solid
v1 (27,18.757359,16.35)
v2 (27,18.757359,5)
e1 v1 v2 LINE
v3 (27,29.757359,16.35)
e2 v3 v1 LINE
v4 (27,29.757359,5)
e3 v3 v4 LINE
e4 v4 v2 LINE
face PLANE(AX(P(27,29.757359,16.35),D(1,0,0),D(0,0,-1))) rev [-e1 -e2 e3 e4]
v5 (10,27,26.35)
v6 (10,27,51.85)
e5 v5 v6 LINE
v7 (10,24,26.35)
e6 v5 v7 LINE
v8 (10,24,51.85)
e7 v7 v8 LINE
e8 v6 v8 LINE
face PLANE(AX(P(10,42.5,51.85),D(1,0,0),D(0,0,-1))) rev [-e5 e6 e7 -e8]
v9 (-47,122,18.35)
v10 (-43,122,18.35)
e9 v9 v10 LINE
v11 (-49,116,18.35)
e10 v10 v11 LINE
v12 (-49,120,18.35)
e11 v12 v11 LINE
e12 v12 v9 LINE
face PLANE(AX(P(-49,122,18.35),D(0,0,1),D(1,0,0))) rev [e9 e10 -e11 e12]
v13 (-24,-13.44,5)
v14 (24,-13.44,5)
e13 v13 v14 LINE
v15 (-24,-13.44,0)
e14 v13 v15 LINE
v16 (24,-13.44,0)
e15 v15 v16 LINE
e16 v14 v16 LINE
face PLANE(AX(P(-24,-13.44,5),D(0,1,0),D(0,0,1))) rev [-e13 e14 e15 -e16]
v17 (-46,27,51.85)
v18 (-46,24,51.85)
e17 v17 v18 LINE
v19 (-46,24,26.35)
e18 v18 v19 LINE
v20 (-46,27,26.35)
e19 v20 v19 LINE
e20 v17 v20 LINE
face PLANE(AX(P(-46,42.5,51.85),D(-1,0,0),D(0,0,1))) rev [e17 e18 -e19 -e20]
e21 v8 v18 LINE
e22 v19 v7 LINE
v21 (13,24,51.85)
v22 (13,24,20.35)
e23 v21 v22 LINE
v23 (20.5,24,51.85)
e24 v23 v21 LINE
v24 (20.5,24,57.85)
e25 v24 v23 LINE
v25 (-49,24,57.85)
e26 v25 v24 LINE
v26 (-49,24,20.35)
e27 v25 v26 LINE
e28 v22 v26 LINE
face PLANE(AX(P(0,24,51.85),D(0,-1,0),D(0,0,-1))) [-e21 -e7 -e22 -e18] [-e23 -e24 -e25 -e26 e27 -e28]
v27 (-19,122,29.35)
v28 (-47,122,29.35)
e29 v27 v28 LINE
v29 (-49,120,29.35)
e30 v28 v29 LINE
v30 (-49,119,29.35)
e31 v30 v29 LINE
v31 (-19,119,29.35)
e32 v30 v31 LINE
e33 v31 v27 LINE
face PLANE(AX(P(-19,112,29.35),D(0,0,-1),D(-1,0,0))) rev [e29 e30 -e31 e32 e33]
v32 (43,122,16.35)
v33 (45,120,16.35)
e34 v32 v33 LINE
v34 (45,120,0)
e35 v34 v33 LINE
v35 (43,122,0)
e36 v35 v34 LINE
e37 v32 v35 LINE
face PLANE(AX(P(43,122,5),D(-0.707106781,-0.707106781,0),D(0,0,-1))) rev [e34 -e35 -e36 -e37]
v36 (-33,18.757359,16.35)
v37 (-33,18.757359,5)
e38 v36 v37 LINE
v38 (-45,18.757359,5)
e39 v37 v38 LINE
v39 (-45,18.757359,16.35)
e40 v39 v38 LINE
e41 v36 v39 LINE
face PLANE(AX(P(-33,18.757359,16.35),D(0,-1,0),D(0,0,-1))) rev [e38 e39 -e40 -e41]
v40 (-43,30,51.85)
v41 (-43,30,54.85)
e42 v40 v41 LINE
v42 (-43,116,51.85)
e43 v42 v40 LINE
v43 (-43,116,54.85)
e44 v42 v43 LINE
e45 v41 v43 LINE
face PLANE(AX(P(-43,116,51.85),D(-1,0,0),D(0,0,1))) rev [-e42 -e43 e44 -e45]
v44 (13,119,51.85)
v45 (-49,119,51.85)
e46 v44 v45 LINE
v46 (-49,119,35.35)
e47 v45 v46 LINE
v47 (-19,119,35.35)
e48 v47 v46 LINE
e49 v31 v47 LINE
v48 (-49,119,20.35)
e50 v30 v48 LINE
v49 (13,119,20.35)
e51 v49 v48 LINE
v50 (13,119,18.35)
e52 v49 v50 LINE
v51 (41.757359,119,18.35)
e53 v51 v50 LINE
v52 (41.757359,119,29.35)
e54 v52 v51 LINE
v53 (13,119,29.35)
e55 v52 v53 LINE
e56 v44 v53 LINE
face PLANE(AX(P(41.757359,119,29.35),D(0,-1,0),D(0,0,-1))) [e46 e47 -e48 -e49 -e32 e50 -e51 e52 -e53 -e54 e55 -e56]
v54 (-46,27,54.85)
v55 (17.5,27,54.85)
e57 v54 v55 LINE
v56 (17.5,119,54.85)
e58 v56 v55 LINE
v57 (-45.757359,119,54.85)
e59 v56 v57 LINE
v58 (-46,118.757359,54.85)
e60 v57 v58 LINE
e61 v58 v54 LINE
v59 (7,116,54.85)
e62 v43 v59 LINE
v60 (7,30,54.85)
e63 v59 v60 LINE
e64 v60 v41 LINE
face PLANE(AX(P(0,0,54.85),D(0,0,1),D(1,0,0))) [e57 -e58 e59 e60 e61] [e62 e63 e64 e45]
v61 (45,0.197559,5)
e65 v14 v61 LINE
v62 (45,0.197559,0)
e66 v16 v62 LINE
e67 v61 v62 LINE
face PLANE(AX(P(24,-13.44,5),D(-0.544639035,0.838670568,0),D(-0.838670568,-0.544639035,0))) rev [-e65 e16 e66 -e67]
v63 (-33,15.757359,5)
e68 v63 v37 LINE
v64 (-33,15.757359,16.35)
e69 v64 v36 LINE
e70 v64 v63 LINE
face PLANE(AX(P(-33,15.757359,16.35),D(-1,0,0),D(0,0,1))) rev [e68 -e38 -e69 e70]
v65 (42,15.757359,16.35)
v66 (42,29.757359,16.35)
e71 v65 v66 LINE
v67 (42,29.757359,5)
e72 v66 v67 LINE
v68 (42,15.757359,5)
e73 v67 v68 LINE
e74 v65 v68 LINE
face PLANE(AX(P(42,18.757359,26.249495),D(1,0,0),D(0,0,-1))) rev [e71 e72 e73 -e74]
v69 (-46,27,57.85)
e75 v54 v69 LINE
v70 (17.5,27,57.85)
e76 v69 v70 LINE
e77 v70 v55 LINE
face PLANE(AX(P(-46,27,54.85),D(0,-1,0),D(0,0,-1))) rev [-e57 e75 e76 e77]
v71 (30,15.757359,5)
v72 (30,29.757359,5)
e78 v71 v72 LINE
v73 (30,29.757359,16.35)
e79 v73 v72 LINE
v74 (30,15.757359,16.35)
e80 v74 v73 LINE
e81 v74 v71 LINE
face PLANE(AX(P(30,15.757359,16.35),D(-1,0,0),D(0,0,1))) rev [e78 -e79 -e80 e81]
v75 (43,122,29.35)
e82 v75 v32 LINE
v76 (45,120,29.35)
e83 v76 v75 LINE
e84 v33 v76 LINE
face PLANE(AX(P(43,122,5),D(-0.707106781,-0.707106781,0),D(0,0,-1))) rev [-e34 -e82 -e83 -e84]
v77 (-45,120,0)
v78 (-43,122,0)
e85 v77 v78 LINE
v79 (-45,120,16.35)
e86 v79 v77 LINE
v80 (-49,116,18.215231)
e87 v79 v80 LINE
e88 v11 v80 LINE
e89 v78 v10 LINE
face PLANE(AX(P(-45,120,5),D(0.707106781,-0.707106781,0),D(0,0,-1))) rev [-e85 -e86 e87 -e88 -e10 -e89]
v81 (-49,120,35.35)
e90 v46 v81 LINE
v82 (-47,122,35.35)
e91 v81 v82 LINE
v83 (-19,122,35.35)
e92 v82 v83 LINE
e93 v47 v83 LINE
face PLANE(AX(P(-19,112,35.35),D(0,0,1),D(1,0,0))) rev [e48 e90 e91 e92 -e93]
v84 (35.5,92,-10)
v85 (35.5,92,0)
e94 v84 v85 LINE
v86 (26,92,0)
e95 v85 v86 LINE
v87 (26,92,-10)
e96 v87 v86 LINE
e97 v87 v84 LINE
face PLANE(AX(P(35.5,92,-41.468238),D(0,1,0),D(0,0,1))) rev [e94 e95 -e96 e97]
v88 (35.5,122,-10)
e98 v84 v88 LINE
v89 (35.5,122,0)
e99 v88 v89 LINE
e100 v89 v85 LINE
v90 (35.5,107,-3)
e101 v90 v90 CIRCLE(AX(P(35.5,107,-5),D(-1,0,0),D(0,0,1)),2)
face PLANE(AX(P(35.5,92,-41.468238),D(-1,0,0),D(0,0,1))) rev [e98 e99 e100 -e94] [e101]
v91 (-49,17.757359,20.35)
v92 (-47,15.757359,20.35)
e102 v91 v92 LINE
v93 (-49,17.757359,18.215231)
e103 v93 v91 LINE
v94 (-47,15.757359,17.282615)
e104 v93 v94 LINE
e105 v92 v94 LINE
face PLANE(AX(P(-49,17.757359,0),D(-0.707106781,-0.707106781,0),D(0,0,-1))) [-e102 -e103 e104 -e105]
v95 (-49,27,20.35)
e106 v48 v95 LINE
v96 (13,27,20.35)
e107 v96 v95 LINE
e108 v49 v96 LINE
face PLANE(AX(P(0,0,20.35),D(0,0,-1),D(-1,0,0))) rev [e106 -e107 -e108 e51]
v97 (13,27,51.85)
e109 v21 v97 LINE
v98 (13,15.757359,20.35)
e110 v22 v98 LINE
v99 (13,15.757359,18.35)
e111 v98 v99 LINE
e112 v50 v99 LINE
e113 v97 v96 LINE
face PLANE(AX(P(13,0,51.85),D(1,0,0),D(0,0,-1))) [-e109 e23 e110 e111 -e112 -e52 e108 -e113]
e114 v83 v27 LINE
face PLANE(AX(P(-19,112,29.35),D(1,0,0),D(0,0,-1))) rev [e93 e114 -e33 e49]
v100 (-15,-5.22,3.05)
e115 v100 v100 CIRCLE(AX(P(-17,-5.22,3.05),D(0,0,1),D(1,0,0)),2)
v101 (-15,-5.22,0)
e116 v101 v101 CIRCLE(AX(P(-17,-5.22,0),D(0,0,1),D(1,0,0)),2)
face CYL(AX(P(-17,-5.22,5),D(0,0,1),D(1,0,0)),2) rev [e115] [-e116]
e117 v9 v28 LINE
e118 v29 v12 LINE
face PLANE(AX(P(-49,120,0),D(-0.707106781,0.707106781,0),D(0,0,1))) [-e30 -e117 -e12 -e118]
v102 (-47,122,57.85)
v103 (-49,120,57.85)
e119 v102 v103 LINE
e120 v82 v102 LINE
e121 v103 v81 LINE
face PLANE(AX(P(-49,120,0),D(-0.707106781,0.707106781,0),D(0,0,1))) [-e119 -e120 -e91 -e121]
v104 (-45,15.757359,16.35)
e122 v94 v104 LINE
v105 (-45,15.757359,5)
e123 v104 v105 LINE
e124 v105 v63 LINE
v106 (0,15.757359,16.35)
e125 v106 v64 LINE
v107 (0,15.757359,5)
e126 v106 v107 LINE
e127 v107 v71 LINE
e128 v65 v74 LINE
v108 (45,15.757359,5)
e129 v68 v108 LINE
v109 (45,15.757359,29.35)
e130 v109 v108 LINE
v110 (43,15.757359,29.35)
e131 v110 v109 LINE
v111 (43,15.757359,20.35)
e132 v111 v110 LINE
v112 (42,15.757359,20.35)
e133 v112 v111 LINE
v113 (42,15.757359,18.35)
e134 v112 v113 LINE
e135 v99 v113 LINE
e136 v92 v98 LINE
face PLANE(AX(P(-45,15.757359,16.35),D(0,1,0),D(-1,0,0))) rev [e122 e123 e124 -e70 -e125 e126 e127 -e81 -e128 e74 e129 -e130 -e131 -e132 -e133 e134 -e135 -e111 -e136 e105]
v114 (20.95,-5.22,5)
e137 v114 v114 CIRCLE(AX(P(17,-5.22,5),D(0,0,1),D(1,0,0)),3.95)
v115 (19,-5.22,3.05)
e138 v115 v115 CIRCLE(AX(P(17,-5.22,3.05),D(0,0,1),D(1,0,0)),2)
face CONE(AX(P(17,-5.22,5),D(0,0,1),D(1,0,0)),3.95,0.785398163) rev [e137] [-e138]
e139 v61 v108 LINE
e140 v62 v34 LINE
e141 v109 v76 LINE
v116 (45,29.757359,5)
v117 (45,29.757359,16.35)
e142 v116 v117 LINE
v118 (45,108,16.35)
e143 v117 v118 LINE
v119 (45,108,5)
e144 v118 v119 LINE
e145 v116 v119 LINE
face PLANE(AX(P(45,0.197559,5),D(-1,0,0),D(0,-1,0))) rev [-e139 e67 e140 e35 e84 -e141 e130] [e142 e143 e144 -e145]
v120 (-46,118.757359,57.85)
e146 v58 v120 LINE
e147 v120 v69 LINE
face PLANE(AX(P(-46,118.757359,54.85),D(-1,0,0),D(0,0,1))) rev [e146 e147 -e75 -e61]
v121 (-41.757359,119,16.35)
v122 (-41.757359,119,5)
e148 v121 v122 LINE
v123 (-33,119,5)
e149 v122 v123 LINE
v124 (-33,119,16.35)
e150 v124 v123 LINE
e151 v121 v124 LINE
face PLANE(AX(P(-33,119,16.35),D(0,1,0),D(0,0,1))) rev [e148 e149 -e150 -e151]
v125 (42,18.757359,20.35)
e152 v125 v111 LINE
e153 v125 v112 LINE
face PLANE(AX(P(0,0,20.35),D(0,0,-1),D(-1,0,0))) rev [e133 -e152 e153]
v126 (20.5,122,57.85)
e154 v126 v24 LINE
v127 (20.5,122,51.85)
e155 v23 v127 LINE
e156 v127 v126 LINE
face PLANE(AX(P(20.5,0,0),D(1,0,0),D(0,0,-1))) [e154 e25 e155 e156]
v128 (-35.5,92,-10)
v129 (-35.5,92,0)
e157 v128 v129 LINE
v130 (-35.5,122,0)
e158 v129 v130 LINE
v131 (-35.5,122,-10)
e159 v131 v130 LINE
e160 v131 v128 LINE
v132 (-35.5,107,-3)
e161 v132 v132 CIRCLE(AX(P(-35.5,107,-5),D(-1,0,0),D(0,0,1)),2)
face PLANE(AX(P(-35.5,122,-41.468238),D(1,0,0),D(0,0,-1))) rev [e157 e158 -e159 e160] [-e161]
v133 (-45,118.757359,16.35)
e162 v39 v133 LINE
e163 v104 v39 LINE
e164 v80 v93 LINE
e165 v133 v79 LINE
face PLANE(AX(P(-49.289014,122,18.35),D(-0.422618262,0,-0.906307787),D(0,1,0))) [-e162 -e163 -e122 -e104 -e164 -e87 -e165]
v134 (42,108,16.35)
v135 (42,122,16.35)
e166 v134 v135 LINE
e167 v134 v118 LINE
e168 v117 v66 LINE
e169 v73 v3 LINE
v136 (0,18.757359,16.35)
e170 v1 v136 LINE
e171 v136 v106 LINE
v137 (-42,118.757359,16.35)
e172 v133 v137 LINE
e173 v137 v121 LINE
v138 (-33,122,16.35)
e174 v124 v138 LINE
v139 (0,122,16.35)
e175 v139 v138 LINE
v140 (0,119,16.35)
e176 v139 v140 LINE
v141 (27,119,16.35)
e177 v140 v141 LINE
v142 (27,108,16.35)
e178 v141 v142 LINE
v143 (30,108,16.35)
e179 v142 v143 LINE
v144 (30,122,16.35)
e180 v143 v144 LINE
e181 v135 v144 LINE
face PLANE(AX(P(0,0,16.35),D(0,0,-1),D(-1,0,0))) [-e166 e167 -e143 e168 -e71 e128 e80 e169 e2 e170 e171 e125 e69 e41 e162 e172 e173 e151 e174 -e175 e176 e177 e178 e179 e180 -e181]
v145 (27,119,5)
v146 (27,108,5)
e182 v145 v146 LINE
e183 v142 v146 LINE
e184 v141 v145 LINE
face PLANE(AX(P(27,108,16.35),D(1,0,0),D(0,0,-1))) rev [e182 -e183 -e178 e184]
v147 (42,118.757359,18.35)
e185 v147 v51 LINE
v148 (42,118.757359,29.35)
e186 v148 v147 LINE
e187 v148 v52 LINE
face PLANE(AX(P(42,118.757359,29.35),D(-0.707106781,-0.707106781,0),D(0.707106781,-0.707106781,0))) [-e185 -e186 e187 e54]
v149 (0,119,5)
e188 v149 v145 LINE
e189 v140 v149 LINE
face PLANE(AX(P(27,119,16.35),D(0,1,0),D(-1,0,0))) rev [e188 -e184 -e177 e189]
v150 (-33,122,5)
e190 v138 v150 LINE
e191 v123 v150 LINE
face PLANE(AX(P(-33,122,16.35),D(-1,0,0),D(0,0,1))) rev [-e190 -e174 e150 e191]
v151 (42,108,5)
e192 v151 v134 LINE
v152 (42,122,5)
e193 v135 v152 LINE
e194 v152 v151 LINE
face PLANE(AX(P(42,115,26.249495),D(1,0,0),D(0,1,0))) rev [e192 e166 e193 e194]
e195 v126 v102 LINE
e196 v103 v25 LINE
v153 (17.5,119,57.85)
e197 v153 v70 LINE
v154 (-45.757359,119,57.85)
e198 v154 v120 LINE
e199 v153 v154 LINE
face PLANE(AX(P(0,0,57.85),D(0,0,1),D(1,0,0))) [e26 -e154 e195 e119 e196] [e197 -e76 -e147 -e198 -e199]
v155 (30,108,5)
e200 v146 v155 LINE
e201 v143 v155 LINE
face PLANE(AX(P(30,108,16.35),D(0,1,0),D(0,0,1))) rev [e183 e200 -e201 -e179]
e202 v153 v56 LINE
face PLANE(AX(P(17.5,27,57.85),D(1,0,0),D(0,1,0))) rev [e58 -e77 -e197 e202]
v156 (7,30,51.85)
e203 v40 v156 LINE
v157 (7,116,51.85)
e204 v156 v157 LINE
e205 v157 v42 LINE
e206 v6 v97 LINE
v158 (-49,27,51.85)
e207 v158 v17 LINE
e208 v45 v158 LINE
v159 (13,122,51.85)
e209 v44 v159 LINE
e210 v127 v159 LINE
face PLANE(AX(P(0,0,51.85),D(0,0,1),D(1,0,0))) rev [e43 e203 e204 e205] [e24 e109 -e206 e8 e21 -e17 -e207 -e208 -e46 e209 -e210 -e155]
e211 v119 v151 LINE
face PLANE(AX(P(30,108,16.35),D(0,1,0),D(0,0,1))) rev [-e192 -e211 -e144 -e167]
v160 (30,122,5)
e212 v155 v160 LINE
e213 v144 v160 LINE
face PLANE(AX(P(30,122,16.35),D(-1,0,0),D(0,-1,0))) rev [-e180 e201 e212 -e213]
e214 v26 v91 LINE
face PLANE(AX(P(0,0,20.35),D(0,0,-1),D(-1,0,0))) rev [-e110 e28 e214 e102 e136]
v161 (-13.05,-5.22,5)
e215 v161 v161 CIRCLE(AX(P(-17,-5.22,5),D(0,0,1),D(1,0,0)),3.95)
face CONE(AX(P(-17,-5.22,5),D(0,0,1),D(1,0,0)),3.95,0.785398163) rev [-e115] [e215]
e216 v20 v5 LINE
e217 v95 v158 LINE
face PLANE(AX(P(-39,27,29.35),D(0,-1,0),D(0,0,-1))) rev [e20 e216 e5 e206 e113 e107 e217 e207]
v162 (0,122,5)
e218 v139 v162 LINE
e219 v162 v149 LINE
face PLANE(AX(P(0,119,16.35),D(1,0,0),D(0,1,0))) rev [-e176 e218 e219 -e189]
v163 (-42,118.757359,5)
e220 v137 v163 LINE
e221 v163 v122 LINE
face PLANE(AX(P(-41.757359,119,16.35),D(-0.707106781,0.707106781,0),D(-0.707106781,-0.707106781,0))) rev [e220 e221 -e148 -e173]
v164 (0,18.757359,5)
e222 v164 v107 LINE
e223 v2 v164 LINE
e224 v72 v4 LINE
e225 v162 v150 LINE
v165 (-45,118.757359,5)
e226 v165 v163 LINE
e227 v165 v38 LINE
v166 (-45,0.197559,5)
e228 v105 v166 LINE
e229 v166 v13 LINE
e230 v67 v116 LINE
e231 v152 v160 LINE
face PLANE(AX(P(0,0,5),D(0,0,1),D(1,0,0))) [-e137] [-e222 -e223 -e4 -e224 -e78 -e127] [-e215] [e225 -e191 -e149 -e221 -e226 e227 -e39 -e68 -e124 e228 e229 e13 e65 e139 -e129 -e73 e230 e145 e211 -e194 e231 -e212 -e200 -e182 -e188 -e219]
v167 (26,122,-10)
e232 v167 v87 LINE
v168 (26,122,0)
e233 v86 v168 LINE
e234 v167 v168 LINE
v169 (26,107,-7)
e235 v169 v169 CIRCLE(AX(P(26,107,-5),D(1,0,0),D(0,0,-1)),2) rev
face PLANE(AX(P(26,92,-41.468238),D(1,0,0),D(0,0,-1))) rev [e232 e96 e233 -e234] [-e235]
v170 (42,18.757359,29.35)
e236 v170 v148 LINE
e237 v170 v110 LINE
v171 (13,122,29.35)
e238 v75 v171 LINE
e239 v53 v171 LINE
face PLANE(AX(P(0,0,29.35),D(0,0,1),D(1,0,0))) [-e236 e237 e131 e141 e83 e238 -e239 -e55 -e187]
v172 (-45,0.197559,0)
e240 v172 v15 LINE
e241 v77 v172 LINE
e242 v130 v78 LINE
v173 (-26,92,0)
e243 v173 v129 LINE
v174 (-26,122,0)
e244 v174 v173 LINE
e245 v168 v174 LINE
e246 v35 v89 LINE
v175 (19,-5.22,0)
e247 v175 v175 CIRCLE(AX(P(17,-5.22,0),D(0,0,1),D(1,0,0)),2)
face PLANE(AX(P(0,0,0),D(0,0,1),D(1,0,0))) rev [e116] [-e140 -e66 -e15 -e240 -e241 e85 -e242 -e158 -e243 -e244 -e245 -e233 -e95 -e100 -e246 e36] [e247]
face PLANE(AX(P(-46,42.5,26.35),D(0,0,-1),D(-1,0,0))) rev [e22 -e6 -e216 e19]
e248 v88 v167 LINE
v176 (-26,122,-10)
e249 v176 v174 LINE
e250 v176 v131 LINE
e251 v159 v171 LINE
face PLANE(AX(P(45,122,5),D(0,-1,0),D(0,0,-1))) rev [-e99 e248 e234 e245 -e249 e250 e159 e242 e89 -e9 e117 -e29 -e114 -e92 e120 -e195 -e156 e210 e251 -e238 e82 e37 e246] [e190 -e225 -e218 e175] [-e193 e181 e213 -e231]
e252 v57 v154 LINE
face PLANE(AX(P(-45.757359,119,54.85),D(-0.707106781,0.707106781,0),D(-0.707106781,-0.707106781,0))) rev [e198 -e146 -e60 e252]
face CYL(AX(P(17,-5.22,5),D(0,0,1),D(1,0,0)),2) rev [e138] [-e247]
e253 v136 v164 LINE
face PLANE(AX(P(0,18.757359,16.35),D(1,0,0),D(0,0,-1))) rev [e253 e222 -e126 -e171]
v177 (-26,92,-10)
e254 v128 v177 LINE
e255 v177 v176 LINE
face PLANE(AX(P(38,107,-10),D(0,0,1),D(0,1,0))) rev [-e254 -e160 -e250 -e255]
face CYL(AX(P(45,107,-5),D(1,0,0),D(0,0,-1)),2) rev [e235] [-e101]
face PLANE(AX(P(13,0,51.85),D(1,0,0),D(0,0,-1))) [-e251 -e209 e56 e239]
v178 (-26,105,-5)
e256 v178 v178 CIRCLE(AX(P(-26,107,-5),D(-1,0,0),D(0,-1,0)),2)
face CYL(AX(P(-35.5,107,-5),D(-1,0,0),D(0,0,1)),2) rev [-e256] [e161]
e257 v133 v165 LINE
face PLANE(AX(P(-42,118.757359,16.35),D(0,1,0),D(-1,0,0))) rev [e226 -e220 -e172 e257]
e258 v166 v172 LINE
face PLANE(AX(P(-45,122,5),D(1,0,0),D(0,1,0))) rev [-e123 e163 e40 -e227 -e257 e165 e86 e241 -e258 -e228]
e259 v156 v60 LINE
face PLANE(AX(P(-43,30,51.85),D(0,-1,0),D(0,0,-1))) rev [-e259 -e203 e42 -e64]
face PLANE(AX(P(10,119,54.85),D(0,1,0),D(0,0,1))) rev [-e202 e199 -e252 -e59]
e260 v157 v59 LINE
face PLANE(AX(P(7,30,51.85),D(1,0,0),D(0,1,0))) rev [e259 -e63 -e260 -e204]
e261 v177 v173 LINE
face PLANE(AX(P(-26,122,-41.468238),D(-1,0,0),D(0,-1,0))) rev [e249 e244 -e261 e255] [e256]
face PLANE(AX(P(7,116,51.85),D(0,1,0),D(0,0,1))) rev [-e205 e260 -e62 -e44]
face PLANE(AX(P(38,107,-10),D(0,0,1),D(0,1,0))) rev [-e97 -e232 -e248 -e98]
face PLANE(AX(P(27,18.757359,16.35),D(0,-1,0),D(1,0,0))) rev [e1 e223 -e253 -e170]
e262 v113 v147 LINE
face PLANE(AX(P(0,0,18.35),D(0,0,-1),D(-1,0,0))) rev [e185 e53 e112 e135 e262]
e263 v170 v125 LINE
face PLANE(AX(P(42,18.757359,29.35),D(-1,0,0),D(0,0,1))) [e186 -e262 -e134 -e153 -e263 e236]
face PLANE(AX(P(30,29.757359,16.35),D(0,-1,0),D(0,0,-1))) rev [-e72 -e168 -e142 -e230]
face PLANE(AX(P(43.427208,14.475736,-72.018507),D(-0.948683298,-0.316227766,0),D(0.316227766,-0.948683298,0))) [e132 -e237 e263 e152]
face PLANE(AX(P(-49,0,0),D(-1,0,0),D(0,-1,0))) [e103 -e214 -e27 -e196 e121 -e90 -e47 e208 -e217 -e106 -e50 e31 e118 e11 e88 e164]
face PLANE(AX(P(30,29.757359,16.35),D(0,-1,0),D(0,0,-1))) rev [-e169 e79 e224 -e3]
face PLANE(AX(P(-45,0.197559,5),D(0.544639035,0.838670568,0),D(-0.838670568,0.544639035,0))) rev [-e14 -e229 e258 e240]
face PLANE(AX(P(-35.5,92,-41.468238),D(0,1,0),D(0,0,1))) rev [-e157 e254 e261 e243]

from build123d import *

# Parameters (mm, degrees)
BOSS_EXTRUDE1_DEPTH           = 5
CHAMFER1_SIZE                 = 2
SKETCH4_W                     = 12
SKETCH4_H                     = 3
BOSS_EXTRUDE2_DEPTH           = 11.35
BOSS_EXTRUDE3_DEPTH           = 4
BOSS_EXTRUDE4_DEPTH           = 11.35
CHAMFER2_START                = 116.672618896
CHAMFER2_OUTLINE_W            = 5
CHAMFER2_OUTLINE_H            = 5.65
CHAMFER2_DEPTH                = 2.327381104
CUT_EXTRUDE2_DEPTH            = 2
BOSS_EXTRUDE5_DEPTH           = 9
BOSS_EXTRUDE6_DEPTH           = 12
SKETCH11_W                    = 3
SKETCH11_H                    = 100.242640687
BOSS_EXTRUDE7_DEPTH           = 9
CHAMFER3_SIZE                 = 2
SKETCH12_W                    = 21
SKETCH12_H                    = 5
CUT_EXTRUDE3_DEPTH            = 9
CHAMFER5_SIZE                 = 4.996701125
CHAMFER5_SIZE_2               = 2.33
SKETCH13_W                    = 12
SKETCH13_H                    = 11.35
CUT_EXTRUDE4_DEPTH            = 117
SKETCH14_W                    = 3
SKETCH14_H                    = 11.35
BOSS_EXTRUDE8_DEPTH           = 7
BOSS_EXTRUDE9_START           = 85.242641
SKETCH14_2_W                  = 3
SKETCH14_2_H                  = 11.35
BOSS_EXTRUDE9_DEPTH           = 8
SKETCH15_W                    = 9
SKETCH15_H                    = 92
CUT_EXTRUDE5_DEPTH            = 10
BOSS_EXTRUDE10_START          = -9
SKETCH16_W                    = 62
SKETCH16_H                    = 3
BOSS_EXTRUDE10_DEPTH          = 31.5
BOSS_EXTRUDE12_DEPTH          = 6
SKETCH18_W                    = 50
SKETCH18_H                    = 86
CUT_EXTRUDE6_DEPTH            = 6
CUT_EXTRUDE7_DEPTH            = 3
SKETCH20_W                    = 6
SKETCH20_H                    = 98
CUT_EXTRUDE8_DEPTH            = 3
BOSS_EXTRUDE13_DEPTH          = 10.5
SKETCH22_W                    = 3
SKETCH22_H                    = 92
BOSS_EXTRUDE14_DEPTH          = 3
CUT_EXTRUDE9_START            = -2
CUT_EXTRUDE9_DEPTH            = 10
CUT_EXTRUDE10_DEPTH           = 9
SKETCH25_W                    = 9.5
SKETCH25_H                    = 30
BOSS_EXTRUDE15_DEPTH          = 10
CSK_FOR_M4_SFHCS2_D           = 4
CSK_FOR_M4_SFHCS2_DEPTH       = 13
CSK_FOR_M4_SFHCS2_CSINK_D     = 7.9
CSK_FOR_M4_SFHCS2_CSINK_ANGLE = 90
CSK_FOR_M4_SFHCS2_TIP         = 1.201721238
CHAMFER6_SIZE                 = 2
CHAMFER6_SIZE_2               = 4.289013841
SKETCH30_W                    = 56
SKETCH30_H                    = 25.5
CUT_EXTRUDE11_DEPTH           = 18.5
SKETCH32_W                    = 30
SKETCH32_H                    = 6
CUT_EXTRUDE13_DEPTH           = 10
CSK_FOR_M4_SFHCS3_D           = 4
CSK_FOR_M4_SFHCS3_DEPTH       = 19
CSK_FOR_M4_SFHCS3_CSINK_D     = 7.9
CSK_FOR_M4_SFHCS3_CSINK_ANGLE = 90
CSK_FOR_M4_SFHCS3_TIP         = 1.201721238
F_4_0MM_DOWEL_HOLE1_D         = 4


with BuildPart() as part:
    # Sketch2 → Boss-Extrude1 (new body)
    with BuildSketch(Plane.XY):
        Polygon((-45, 122), (-45, 0.197559457), (-24, -13.44), (24, -13.44), (45, 0.197559457), (45, 122), align=None)
    extrude(amount=BOSS_EXTRUDE1_DEPTH)

    # Chamfer1
    chamfer1_edges = [part.edges().sort_by_distance(p)[0] for p in [
        (45, 122, 2.5),
        (-45, 122, 2.5),
    ]]
    chamfer(chamfer1_edges, length=CHAMFER1_SIZE)

    # Sketch4 → Boss-Extrude2 (add)
    with BuildSketch(Plane.XY.offset(5)):
        Polygon((-45, 120), (-43, 122), (-33, 122), (-33, 119), (-41.757359313, 119), (-42, 118.757359313), (-45, 118.757359313), align=None)
        with Locations((-39, 17.257359313)):
            Rectangle(SKETCH4_W, SKETCH4_H)
        Polygon((0, 122), (30, 122), (30, 108), (27, 108), (27, 119), (0, 119), align=None)
        Polygon((0, 15.757359313), (30, 15.757359313), (30, 29.757359313), (27, 29.757359313), (27, 18.757359313), (0, 18.757359313), align=None)
    extrude(amount=BOSS_EXTRUDE2_DEPTH)

    # Sketch5 → Boss-Extrude3 (add)
    with BuildSketch(Plane.XY.offset(16.35)):
        Polygon((45, 15.757359313), (-45, 15.757359313), (-45, 120), (-43, 122), (45, 122), align=None)
    extrude(amount=BOSS_EXTRUDE3_DEPTH)

    # Sketch6 → Boss-Extrude4 (add)
    with BuildSketch(Plane.XY.offset(5)):
        Polygon((38, 122), (43, 122), (45, 120), (45, 115), (42, 115), (42, 118.757359313), (41.757359313, 119), (38, 119), align=None)
        Polygon((45, 15.757359313), (39, 15.757359313), (39, 18.757359313), (42, 18.757359313), (42, 21.757359313), (45, 21.757359313), align=None)
    extrude(amount=BOSS_EXTRUDE4_DEPTH)

    # Chamfer2: read off the stored shape, not the designer's step
    # Chamfer2 outline → Chamfer2 (cut)
    with BuildSketch(Plane(origin=(0, 0, 0), x_dir=(0.7071067811865474, -0.7071067811865477, 0), z_dir=(0.7071067811865476, 0.7071067811865476, 0)).offset(CHAMFER2_START)):
        with Locations((-54.5, -19.175)):
            Rectangle(CHAMFER2_OUTLINE_W, CHAMFER2_OUTLINE_H)
    extrude(amount=CHAMFER2_DEPTH, mode=Mode.SUBTRACT)

    # Sketch8 → Cut-Extrude2 (cut)
    with BuildSketch(Plane.XY.offset(20.35)):
        Polygon((-45, 15.757359313), (-37, 15.757359313), (-37, 122), (-43, 122), (-45, 120), align=None)
    extrude(amount=-CUT_EXTRUDE2_DEPTH, mode=Mode.SUBTRACT)

    # Sketch9 → Boss-Extrude5 (add)
    with BuildSketch(Plane.XY.offset(20.35)):
        Polygon((-37, 18.757359313), (42, 18.757359313), (42, 118.757359313), (41.757359313, 119), (-37, 119), (-37, 122), (43, 122), (45, 120), (45, 15.757359313), (-37, 15.757359313), align=None)
    extrude(amount=BOSS_EXTRUDE5_DEPTH)

    # Sketch10 → Boss-Extrude6 (add)
    with BuildSketch(Plane.ZY.offset(37)):
        Polygon((18.35, 15.757359313), (29.35, 15.757359313), (29.35, 18.757359313), (20.35, 18.757359313), (20.35, 119), (29.35, 119), (29.35, 122), (18.35, 122), align=None)
    extrude(amount=BOSS_EXTRUDE6_DEPTH)

    # Sketch11 → Boss-Extrude7 (add)
    with BuildSketch(Plane.XY.offset(20.35)):
        with Locations((-47.5, 68.878679657)):
            Rectangle(SKETCH11_W, SKETCH11_H)
    extrude(amount=BOSS_EXTRUDE7_DEPTH)

    # Chamfer3
    chamfer3_edges = [part.edges().sort_by_distance(p)[0] for p in [
        (-49, 15.757359313, 23.85),
        (-49, 122, 23.85),
    ]]
    chamfer(chamfer3_edges, length=CHAMFER3_SIZE)

    # Sketch12 → Cut-Extrude3 (cut)
    with BuildSketch(Plane(origin=(0, 18.757359313, 0), x_dir=(1, 0, 0), z_dir=(0, 1, 0))):
        with Locations((27.5, -22.85)):
            Rectangle(SKETCH12_W, SKETCH12_H)
    extrude(amount=-CUT_EXTRUDE3_DEPTH, mode=Mode.SUBTRACT)

    # Chamfer5
    # the kernel refuses this chamfer: 4.996701125, 2.33 mm, written as the material it takes off along each edge
    with BuildSketch(Plane(origin=(38, 18.757359313, 20.35), x_dir=(1, 0, 0), z_dir=(0, 0, 1))) as chamfer5_piece_1_section:
        Polygon((CHAMFER5_SIZE, 0), (0, -CHAMFER5_SIZE_2), (0, 0), align=None)
    chamfer5_piece_1 = extrude(amount=5, mode=Mode.PRIVATE)
    chamfer5_piece_1 = split(chamfer5_piece_1, bisect_by=Plane(origin=(42, 18.757359313, 20.35), z_dir=(-1, 0, 0)), keep=Keep.TOP, mode=Mode.PRIVATE)
    add(chamfer5_piece_1, mode=Mode.SUBTRACT)
    with BuildSketch(Plane(origin=(17, 18.757359313, 25.35), x_dir=(-1, 0, 0), z_dir=(0, 0, -1))) as chamfer5_piece_2:
        Polygon((CHAMFER5_SIZE, 0), (0, -CHAMFER5_SIZE_2), (0, 0), align=None)
    extrude(amount=5, mode=Mode.SUBTRACT)

    # Sketch13 → Cut-Extrude4 (cut)
    with BuildSketch(Plane(origin=(0, 122, 0), x_dir=(1, 0, 0), z_dir=(0, 1, 0))):
        with Locations((36, -10.675)):
            Rectangle(SKETCH13_W, SKETCH13_H)
    extrude(amount=-CUT_EXTRUDE4_DEPTH, mode=Mode.SUBTRACT)

    # Sketch14 → Boss-Extrude8 (add)
    with BuildSketch(Plane.XZ.offset(-115)):
        with Locations((43.5, 10.675)):
            Rectangle(SKETCH14_W, SKETCH14_H)
    extrude(amount=BOSS_EXTRUDE8_DEPTH)

    # Sketch14<2> → Boss-Extrude9 (add)
    with BuildSketch(Plane.XZ.offset(-115).offset(BOSS_EXTRUDE9_START)):
        with Locations((43.5, 10.675)):
            Rectangle(SKETCH14_2_W, SKETCH14_2_H)
    extrude(amount=BOSS_EXTRUDE9_DEPTH)

    # Sketch15 → Cut-Extrude5 (cut)
    with BuildSketch(Plane.ZY.offset(49)):
        with Locations((24.85, 73)):
            Rectangle(SKETCH15_W, SKETCH15_H)
    extrude(amount=-CUT_EXTRUDE5_DEPTH, mode=Mode.SUBTRACT)

    # Sketch16 → Boss-Extrude10 (add)
    with BuildSketch(Plane.XY.offset(29.35).offset(BOSS_EXTRUDE10_START)):
        Polygon((13, 122), (13, 119), (-49, 119), (-49, 120), (-47, 122), align=None)
        with Locations((-18, 25.5)):
            Rectangle(SKETCH16_W, SKETCH16_H)
    extrude(amount=BOSS_EXTRUDE10_DEPTH)

    # Sketch17 → Boss-Extrude12 (add)
    with BuildSketch(Plane.XY.offset(51.85)):
        Polygon((-49, 119), (-49, 27), (-49, 24), (13, 24), (13, 27), (13, 119), (13, 122), (-47, 122), (-49, 120), align=None)
    extrude(amount=BOSS_EXTRUDE12_DEPTH)

    # Sketch18 → Cut-Extrude6 (cut)
    with BuildSketch(Plane.XY.offset(57.85)):
        with Locations((-18, 73)):
            Rectangle(SKETCH18_W, SKETCH18_H)
    extrude(amount=-CUT_EXTRUDE6_DEPTH, mode=Mode.SUBTRACT)

    # Sketch19 → Cut-Extrude7 (cut)
    with BuildSketch(Plane.XY.offset(57.85)):
        Polygon((10, 119), (-45.757359313, 119), (-46, 118.757359313), (-46, 27), (10, 27), align=None)
    extrude(amount=-CUT_EXTRUDE7_DEPTH, mode=Mode.SUBTRACT)

    # Sketch20 → Cut-Extrude8 (cut)
    with BuildSketch(Plane(origin=(13, 0, 0), x_dir=(0, 0, -1), z_dir=(1, 0, 0))):
        with Locations((-54.85, 73)):
            Rectangle(SKETCH20_W, SKETCH20_H)
    extrude(amount=-CUT_EXTRUDE8_DEPTH, mode=Mode.SUBTRACT)

    # Sketch21 → Boss-Extrude13 (add)
    with BuildSketch(Plane(origin=(10, 0, 0), x_dir=(0, 0, -1), z_dir=(1, 0, 0))):
        Polygon((-57.85, 27), (-57.85, 24), (-51.85, 24), (-51.85, 27), (-51.85, 119), (-51.85, 122), (-57.85, 122), (-57.85, 119), (-54.85, 119), (-54.85, 27), align=None)
    extrude(amount=BOSS_EXTRUDE13_DEPTH)

    # Sketch22 → Boss-Extrude14 (add)
    with BuildSketch(Plane.XY.offset(54.85)):
        with Locations((19, 73)):
            Rectangle(SKETCH22_W, SKETCH22_H)
    extrude(amount=BOSS_EXTRUDE14_DEPTH)

    # Sketch23 → Cut-Extrude9 (cut)
    with BuildSketch(Plane.XY.offset(20.35).offset(CUT_EXTRUDE9_START)):
        Polygon((13, 15.757359313), (13, 119), (41.757359313, 119), (42, 118.757359313), (42, 15.757359313), align=None)
    extrude(amount=CUT_EXTRUDE9_DEPTH, mode=Mode.SUBTRACT)

    # Sketch24 → Cut-Extrude10 (cut)
    with BuildSketch(Plane.XY.offset(29.35)):
        Polygon((43, 15.757359313), (42, 18.757359313), (-46, 18.757359313), (-46, 24), (-49, 24), (-49, 17.757359313), (-47, 15.757359313), align=None)
    extrude(amount=-CUT_EXTRUDE10_DEPTH, mode=Mode.SUBTRACT)

    # Sketch25 → Boss-Extrude15 (add)
    with BuildSketch(Plane(origin=(0, 0, 0), x_dir=(-1, 0, 0), z_dir=(0, 0, -1))):
        with Locations((30.75, 107)):
            Rectangle(SKETCH25_W, SKETCH25_H)
        with Locations((-30.75, 107)):
            Rectangle(SKETCH25_W, SKETCH25_H)
    extrude(amount=BOSS_EXTRUDE15_DEPTH)

    # CSK for M4 SFHCS2
    with Locations(Plane(origin=(-695.683007616, 1385.247292614, 5), x_dir=(1, 0, 0), z_dir=(0, 0, 1))):
        with Locations((678.683007616, -1390.467292614), (712.683007616, -1390.467292614)):
            CounterSinkHole(CSK_FOR_M4_SFHCS2_D / 2, CSK_FOR_M4_SFHCS2_CSINK_D / 2, depth=CSK_FOR_M4_SFHCS2_DEPTH, counter_sink_angle=CSK_FOR_M4_SFHCS2_CSINK_ANGLE)
            with Locations((0, 0, -(CSK_FOR_M4_SFHCS2_DEPTH + CSK_FOR_M4_SFHCS2_TIP / 2))):  # 118° drill point
                Cone(0, CSK_FOR_M4_SFHCS2_D / 2, CSK_FOR_M4_SFHCS2_TIP, mode=Mode.SUBTRACT)

    # Chamfer6
    # the kernel refuses this chamfer: 4.289013841, 2 mm, written as the material it adds along each edge
    with BuildSketch(Plane(origin=(-45, 131.112729659, 18.35), x_dir=(0, 0, -1), z_dir=(0, -1, 0))) as chamfer6_piece_1_section:
        Polygon((CHAMFER6_SIZE, 0), (0, -CHAMFER6_SIZE_2), (0, 0), align=None)
    chamfer6_piece_1 = extrude(amount=115.355370346, mode=Mode.PRIVATE)
    chamfer6_piece_1 = split(chamfer6_piece_1, bisect_by=Plane(origin=(-49, 131.112729659, 18.35), z_dir=(1, 0, 0)), keep=Keep.TOP, mode=Mode.PRIVATE)
    chamfer6_piece_1 = split(chamfer6_piece_1, bisect_by=Plane(origin=(-39.443635171, 125.556364829, 18.35), z_dir=(0.7071067811865476, -0.7071067811865476, 0)), keep=Keep.TOP, mode=Mode.PRIVATE)
    chamfer6_piece_1 = split(chamfer6_piece_1, bisect_by=Plane(origin=(-103.677685173, 72.435044486, 18.35), z_dir=(0.7071067811865476, 0.7071067811865476, 0)), keep=Keep.TOP, mode=Mode.PRIVATE)
    add(chamfer6_piece_1)

    # Sketch30 → Cut-Extrude11 (cut)
    with BuildSketch(Plane(origin=(-695.683007616, 24, -941.083024415), x_dir=(1, 0, 0), z_dir=(0, -1, 0))):
        with Locations((677.683007616, 980.183024415)):
            Rectangle(SKETCH30_W, SKETCH30_H)
    extrude(amount=-CUT_EXTRUDE11_DEPTH, mode=Mode.SUBTRACT)

    # Sketch32 → Cut-Extrude13 (cut)
    with BuildSketch(Plane(origin=(0, 122, 0), x_dir=(1, 0, 0), z_dir=(0, 1, 0))):
        with Locations((-34, -32.35)):
            Rectangle(SKETCH32_W, SKETCH32_H)
    extrude(amount=-CUT_EXTRUDE13_DEPTH, mode=Mode.SUBTRACT)

    # CSK for M4 SFHCS3
    with Locations(Plane(origin=(45, 1385.247292614, -941.083024415), x_dir=(0, 1, 0), z_dir=(1, 0, 0))):
        with Locations((-1278.247292614, 936.083024415)):
            CounterSinkHole(CSK_FOR_M4_SFHCS3_D / 2, CSK_FOR_M4_SFHCS3_CSINK_D / 2, depth=CSK_FOR_M4_SFHCS3_DEPTH, counter_sink_angle=CSK_FOR_M4_SFHCS3_CSINK_ANGLE)
            with Locations((0, 0, -(CSK_FOR_M4_SFHCS3_DEPTH + CSK_FOR_M4_SFHCS3_TIP / 2))):  # 118° drill point
                Cone(0, CSK_FOR_M4_SFHCS3_D / 2, CSK_FOR_M4_SFHCS3_TIP, mode=Mode.SUBTRACT)

    # Ø4.0mm Dowel Hole1 (through all)
    with Locations(Plane.ZY.offset(35.5)):
        with Locations((-5, 107)):
            Hole(F_4_0MM_DOWEL_HOLE1_D / 2)


solid = part.part
